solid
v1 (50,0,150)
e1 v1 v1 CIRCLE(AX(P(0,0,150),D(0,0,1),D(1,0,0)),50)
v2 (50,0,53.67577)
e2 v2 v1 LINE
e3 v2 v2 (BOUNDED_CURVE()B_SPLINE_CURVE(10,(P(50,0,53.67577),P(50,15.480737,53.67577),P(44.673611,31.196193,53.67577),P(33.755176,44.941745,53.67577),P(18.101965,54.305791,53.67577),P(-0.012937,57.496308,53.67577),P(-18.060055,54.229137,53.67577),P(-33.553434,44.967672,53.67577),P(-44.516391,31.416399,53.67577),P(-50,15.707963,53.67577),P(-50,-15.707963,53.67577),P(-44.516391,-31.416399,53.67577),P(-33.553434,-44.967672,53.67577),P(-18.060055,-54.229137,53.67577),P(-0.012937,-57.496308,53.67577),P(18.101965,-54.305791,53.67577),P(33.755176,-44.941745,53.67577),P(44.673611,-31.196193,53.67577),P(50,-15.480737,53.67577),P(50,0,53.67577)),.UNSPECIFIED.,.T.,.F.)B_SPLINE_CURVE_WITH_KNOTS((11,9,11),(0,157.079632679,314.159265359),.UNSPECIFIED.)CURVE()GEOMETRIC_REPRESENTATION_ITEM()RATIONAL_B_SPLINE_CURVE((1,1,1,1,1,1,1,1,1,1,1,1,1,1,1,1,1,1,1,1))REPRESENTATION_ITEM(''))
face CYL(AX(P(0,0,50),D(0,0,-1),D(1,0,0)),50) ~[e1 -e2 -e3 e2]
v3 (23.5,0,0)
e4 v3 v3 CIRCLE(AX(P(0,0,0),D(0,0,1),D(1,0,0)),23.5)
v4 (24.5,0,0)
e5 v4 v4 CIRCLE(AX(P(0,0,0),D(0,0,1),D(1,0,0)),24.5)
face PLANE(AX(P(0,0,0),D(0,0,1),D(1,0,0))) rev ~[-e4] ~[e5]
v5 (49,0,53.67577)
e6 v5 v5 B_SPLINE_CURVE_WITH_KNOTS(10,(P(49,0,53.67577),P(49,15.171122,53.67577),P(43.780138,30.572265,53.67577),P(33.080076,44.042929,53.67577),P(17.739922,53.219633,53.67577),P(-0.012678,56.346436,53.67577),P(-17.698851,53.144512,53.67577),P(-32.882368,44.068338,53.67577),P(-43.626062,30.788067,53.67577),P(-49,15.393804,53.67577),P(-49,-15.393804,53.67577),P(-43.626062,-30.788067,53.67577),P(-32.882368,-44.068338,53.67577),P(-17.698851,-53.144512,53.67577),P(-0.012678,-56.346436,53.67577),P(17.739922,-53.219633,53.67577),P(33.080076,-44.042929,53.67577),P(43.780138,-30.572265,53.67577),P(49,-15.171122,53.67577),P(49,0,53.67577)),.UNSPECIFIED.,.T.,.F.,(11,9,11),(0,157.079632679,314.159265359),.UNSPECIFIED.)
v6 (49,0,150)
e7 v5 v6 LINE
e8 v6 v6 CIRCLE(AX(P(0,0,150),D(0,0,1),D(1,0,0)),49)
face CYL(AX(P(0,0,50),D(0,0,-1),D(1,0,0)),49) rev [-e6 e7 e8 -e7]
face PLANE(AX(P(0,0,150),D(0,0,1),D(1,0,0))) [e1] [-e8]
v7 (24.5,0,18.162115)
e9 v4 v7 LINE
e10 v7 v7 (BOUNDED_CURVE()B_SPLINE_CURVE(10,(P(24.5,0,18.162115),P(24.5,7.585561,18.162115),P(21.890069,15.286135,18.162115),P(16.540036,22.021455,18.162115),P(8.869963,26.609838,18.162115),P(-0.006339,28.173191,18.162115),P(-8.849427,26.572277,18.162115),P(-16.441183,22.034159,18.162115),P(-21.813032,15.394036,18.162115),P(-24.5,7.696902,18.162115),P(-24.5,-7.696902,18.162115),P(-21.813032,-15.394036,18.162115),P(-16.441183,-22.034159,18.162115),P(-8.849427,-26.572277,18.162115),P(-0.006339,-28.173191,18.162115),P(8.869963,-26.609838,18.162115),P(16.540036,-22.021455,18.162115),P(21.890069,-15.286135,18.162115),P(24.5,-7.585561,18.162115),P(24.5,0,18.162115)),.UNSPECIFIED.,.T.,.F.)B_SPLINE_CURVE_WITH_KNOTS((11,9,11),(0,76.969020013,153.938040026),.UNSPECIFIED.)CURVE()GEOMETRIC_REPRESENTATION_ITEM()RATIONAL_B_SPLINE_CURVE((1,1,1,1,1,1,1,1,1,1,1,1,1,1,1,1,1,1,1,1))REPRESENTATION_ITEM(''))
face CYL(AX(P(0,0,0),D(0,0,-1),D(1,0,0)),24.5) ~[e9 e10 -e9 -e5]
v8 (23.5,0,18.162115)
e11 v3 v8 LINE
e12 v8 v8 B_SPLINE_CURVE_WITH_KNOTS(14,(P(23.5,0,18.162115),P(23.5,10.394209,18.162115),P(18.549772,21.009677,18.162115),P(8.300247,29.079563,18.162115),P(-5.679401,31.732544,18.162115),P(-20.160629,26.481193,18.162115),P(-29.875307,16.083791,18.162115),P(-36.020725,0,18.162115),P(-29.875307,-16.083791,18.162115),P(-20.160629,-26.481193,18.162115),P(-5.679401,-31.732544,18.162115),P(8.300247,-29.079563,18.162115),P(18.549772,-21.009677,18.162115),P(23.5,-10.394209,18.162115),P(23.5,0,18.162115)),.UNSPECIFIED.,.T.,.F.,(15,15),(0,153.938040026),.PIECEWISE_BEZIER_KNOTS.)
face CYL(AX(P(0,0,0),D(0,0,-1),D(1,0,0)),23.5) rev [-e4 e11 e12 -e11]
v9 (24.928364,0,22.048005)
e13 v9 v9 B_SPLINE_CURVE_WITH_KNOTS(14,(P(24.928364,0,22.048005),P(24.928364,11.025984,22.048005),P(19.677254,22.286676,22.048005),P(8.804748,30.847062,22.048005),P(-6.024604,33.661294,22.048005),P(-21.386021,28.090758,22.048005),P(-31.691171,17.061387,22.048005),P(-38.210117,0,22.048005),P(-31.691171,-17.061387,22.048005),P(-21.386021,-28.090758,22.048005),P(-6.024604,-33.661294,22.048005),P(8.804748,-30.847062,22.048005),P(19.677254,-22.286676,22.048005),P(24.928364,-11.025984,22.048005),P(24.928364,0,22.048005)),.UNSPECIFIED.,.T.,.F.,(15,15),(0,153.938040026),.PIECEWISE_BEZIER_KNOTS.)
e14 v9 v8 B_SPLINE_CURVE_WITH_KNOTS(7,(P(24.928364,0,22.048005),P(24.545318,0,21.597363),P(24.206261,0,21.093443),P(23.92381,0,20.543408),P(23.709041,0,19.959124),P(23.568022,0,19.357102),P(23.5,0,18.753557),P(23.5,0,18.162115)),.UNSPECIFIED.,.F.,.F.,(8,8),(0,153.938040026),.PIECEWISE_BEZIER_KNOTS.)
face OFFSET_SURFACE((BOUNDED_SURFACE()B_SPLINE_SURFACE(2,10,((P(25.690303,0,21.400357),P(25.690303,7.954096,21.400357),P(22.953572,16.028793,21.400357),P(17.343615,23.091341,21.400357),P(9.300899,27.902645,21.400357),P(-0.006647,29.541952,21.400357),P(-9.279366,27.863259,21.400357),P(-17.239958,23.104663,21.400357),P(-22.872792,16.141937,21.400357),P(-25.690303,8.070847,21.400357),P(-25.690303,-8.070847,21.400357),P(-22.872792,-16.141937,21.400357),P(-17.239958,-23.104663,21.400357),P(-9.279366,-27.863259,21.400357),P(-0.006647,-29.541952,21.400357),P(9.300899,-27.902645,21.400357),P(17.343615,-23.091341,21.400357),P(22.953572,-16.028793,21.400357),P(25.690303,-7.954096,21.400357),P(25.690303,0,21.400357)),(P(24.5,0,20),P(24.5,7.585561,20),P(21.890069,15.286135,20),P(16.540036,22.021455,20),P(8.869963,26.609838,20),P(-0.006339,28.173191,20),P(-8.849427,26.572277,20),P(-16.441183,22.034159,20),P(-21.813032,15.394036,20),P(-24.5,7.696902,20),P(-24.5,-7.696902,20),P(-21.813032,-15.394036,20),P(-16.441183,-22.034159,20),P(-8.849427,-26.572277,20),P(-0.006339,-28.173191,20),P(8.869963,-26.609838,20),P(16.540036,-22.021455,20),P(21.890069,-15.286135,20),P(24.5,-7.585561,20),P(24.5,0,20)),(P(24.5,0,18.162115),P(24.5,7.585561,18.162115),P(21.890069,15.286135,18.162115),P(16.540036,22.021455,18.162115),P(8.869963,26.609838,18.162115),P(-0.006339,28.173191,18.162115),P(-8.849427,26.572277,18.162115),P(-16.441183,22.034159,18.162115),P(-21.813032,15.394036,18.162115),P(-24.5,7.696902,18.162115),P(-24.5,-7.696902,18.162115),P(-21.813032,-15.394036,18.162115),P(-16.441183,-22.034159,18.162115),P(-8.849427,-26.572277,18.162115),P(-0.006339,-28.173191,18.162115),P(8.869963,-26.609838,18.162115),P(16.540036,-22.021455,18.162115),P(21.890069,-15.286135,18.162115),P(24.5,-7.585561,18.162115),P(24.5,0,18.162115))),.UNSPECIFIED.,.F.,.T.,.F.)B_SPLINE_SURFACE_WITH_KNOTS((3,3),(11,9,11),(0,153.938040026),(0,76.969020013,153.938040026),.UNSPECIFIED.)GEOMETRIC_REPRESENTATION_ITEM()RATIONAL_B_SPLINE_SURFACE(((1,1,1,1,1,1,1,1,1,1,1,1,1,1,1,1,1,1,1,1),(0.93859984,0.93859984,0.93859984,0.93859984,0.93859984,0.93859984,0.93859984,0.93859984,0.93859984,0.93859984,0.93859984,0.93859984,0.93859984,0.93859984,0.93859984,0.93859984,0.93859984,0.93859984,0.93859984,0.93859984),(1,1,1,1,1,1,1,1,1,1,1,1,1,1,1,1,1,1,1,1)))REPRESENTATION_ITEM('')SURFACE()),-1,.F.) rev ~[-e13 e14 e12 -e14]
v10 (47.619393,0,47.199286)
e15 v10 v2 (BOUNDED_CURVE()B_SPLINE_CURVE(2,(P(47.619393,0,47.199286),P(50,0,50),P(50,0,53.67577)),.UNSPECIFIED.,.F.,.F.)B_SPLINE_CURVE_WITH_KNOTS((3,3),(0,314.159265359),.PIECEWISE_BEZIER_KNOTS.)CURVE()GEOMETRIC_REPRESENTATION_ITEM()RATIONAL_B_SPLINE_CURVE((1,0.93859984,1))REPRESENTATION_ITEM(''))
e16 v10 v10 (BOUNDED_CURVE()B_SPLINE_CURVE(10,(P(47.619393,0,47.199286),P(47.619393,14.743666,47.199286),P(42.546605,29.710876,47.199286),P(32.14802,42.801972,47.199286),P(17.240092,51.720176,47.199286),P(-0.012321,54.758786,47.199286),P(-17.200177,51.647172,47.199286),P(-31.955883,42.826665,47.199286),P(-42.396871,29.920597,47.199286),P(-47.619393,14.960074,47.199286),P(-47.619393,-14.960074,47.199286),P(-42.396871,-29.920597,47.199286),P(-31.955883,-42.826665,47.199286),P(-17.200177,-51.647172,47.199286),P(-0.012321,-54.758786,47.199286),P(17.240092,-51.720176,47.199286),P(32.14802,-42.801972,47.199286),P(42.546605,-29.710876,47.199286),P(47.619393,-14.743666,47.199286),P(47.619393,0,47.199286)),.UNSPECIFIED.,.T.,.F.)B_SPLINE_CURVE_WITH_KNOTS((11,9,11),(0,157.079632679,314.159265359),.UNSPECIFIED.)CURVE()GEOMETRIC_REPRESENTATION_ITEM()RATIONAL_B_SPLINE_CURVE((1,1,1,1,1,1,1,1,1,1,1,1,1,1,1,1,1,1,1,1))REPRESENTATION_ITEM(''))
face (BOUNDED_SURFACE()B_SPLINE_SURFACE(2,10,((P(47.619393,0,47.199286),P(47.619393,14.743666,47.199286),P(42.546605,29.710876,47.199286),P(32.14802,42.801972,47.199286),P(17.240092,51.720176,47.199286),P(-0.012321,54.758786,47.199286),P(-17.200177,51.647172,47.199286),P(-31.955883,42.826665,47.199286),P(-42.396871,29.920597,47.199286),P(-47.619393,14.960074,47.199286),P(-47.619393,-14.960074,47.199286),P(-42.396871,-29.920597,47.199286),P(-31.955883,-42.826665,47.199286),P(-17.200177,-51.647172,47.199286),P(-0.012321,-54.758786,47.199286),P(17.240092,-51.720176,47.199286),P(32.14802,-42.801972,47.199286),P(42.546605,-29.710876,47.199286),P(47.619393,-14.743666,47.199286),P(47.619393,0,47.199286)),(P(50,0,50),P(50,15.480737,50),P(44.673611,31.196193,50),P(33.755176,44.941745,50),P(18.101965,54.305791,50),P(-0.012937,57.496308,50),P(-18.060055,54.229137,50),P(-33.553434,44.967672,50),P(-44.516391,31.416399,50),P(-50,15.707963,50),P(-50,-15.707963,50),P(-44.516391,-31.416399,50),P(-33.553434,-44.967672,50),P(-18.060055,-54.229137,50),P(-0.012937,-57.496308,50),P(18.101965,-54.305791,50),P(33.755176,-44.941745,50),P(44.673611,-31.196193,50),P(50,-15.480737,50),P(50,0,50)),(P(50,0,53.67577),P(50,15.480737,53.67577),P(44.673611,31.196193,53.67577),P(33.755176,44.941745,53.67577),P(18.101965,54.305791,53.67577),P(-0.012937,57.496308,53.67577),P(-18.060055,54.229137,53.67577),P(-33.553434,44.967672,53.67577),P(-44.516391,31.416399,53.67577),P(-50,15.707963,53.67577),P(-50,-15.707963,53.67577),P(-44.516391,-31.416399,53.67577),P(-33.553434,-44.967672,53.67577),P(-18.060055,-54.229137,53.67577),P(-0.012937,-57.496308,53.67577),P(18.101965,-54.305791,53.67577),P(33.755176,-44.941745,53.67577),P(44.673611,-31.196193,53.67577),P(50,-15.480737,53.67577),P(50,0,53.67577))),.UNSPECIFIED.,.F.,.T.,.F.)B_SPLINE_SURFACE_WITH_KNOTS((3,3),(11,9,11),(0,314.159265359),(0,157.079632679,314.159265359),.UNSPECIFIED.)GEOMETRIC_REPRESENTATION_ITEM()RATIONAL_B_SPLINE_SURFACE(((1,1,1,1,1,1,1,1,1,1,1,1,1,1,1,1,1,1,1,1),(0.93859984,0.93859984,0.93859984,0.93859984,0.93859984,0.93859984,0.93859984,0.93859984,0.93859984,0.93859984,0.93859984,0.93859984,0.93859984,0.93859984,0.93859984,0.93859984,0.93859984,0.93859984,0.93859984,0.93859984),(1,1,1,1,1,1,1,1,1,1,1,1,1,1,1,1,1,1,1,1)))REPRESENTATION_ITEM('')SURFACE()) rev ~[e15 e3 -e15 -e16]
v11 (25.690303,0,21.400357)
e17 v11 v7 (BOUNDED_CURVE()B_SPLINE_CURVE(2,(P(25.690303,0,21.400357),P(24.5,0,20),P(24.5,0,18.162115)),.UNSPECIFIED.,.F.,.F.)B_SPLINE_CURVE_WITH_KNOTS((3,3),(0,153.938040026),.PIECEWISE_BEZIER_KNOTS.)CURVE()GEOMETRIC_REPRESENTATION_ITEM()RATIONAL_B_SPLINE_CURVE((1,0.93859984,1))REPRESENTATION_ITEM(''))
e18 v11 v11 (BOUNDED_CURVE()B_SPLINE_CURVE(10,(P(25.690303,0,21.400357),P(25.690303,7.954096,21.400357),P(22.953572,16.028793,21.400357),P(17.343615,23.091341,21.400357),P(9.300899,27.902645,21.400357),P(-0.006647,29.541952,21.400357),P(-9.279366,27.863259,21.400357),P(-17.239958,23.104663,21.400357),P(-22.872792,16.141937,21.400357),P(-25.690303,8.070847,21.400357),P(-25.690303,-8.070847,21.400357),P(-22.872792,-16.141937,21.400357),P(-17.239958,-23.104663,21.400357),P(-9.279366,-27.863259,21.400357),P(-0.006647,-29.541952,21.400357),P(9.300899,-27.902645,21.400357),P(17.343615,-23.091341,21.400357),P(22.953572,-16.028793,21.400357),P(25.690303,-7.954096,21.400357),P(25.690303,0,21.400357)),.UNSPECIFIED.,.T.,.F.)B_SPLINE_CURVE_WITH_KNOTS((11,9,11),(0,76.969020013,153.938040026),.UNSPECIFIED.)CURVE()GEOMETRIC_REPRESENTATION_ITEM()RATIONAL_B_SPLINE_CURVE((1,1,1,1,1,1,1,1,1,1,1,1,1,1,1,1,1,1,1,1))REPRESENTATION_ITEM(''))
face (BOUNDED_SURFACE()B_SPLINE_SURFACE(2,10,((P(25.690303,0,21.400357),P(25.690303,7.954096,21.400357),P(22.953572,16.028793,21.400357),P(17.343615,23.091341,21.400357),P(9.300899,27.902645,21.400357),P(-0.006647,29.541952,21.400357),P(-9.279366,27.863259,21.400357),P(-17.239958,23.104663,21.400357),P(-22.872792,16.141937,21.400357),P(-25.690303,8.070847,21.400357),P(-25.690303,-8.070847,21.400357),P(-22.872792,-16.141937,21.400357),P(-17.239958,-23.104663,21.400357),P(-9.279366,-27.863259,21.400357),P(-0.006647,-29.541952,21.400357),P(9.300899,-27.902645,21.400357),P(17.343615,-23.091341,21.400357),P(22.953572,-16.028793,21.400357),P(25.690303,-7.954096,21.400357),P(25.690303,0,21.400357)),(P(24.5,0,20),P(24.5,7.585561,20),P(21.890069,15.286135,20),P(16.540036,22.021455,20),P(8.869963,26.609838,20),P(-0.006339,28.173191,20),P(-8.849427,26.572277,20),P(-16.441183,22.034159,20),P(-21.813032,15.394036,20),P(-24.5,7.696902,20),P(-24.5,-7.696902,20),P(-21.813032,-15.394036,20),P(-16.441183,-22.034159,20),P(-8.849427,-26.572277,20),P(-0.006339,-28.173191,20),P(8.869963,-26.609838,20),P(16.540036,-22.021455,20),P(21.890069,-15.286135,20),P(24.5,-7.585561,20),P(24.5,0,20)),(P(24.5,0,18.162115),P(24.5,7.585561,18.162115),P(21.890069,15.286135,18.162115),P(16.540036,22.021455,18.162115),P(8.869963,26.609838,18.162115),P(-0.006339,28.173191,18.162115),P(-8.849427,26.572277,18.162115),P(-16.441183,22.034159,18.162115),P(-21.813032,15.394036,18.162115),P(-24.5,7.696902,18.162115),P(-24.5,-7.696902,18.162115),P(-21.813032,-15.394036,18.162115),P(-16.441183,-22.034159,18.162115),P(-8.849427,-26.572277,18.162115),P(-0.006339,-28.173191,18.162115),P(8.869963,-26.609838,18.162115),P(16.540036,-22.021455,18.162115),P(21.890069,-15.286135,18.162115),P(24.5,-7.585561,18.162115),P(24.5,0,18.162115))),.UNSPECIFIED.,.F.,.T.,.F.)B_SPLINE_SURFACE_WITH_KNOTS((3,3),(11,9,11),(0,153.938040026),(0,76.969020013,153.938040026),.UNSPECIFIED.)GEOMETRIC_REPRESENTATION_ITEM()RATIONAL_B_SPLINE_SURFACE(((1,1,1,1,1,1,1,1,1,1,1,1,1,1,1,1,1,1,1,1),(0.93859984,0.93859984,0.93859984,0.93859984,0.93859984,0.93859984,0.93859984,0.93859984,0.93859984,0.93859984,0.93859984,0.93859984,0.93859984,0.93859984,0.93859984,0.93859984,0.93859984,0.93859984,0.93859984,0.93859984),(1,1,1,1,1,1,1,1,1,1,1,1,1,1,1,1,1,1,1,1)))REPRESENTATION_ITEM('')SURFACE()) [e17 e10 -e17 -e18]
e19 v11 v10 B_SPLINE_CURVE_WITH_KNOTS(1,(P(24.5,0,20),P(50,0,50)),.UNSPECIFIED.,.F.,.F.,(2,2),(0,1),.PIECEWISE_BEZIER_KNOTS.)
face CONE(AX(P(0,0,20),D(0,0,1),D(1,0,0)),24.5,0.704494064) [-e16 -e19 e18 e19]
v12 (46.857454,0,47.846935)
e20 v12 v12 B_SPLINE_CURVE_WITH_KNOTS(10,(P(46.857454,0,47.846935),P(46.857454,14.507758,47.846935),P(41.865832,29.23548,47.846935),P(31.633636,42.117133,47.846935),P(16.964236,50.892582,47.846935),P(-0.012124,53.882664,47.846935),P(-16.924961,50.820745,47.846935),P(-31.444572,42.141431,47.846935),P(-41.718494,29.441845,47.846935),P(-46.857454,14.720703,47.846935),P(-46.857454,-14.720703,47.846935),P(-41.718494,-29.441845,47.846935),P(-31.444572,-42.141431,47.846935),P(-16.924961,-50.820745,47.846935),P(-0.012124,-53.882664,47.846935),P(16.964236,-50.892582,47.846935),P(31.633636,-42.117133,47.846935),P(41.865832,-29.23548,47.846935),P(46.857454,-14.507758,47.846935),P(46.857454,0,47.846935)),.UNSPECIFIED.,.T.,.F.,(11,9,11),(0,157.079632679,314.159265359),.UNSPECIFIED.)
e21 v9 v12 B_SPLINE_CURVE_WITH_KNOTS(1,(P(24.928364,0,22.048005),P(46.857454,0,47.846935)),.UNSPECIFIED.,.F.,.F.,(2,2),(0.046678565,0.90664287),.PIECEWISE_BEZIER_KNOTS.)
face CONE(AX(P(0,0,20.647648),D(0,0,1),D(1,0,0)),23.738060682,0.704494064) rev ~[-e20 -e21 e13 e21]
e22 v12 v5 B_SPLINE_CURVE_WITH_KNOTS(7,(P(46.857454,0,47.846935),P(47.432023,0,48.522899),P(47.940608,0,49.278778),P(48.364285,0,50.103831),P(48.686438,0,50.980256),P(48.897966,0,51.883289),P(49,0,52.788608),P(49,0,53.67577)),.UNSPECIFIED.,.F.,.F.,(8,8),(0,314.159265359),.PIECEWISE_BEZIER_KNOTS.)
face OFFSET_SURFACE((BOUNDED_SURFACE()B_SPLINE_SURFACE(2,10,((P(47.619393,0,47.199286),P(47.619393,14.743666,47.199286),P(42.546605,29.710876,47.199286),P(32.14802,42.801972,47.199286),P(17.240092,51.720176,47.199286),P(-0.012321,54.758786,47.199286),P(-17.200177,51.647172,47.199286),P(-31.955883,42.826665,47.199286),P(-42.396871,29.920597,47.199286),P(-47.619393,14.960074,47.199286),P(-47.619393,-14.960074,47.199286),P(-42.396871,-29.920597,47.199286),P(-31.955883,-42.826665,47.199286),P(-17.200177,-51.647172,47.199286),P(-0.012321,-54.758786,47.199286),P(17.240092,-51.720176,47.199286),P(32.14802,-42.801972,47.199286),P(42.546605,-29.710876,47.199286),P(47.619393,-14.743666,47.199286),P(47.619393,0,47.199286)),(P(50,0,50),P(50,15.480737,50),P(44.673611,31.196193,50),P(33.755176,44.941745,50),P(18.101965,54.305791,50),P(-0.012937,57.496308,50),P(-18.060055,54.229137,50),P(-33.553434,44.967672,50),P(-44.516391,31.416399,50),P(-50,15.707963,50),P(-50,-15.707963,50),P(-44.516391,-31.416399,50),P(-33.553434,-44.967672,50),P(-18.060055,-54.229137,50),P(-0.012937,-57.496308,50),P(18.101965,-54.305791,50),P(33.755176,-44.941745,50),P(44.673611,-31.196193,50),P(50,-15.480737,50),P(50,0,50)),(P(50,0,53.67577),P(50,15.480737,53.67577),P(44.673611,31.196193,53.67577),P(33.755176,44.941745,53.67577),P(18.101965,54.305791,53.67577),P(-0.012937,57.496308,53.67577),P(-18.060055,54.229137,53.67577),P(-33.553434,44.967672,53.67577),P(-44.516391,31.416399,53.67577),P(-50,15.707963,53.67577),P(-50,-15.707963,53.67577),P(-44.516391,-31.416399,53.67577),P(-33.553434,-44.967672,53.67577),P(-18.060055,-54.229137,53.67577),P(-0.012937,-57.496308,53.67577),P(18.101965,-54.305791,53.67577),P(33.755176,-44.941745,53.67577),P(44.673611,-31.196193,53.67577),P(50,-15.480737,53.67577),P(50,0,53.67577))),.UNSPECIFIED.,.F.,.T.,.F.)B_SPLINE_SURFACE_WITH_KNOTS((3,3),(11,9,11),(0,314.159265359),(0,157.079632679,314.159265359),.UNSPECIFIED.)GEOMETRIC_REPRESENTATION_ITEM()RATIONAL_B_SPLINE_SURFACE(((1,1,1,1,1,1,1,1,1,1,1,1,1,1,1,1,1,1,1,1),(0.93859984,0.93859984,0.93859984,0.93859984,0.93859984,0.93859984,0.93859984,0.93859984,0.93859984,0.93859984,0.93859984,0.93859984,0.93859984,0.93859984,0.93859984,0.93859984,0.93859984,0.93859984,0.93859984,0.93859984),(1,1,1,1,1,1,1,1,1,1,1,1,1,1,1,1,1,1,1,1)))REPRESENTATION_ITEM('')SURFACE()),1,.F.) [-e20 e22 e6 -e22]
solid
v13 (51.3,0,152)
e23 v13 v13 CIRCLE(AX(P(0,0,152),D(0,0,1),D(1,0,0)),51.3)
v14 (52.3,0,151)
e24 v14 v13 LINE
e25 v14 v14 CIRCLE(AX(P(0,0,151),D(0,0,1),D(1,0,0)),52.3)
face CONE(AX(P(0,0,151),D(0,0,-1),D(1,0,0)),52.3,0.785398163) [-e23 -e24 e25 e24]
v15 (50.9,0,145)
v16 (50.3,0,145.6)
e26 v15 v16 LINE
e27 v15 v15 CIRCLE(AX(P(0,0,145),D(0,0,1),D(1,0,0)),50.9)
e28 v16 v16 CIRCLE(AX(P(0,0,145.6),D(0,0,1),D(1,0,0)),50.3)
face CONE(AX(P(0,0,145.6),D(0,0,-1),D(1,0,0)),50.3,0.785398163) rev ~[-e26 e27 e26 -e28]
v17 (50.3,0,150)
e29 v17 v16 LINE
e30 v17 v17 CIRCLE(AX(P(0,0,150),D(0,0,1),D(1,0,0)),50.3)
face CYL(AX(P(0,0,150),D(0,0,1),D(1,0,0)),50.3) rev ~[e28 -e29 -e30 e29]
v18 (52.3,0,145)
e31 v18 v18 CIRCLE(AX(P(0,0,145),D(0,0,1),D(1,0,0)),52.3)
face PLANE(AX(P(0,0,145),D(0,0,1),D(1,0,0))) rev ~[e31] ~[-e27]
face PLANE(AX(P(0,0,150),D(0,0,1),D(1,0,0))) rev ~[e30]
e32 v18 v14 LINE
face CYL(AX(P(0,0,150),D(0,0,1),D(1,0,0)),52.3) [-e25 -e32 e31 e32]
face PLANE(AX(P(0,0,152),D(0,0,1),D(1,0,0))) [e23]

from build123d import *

# Parameters (mm, degrees)
F0_R      = 24.5
F1_DEPTH  = 20
F1_FACE_R = 24.5
F3_R      = 50
F5_DEPTH  = 100
F6_R      = 5
F7_R      = 10
F8_T      = -1
F9_R      = 52.3
F9_R_2    = 50.3
F9_R_3    = 50
F9_R_4    = 49
F10_DEPTH = 2
F11_DEPTH = 5
F12_SIZE  = 1
F13_SIZE  = 0.6


with BuildPart() as f1:
    # F0 (on Top) → F1 (new body)
    with BuildSketch(Plane.XY):
        Circle(F0_R)
    extrude(amount=F1_DEPTH)

    # F1_face (on face) → F4 section 0
    with BuildSketch(Plane.XY.offset(20)):
        Circle(F1_FACE_R)
    # F3 (on offset) → F4 section 1
    with BuildSketch(Plane.XY.offset(50)):
        Circle(F3_R)
    loft()

    # F5 (add): a face of the model
    f5_faces = [f1.faces().sort_by_distance(p)[0] for p in [
        (0, 0, 50),
    ]]
    extrude(f5_faces, amount=F5_DEPTH)

    # F6
    f6_edges = [f1.edges().sort_by_distance(p)[0] for p in [
        (-24.5, 0, 20),
    ]]
    fillet(f6_edges, radius=F6_R)

    # F7
    f7_edges = [f1.edges().sort_by_distance(p)[0] for p in [
        (-50, 0, 50),
    ]]
    fillet(f7_edges, radius=F7_R)

    # F8
    f8_openings = [f1.faces().sort_by_distance(p)[0] for p in [
        (0, 0, 0),
        (0, 0, 150),
    ]]
    offset(amount=F8_T, openings=f8_openings)


with BuildPart() as f10:
    # F9 (on face) → F10 (new body)
    with BuildSketch(Plane.XY.offset(150)):
        Circle(F9_R)
        Circle(F9_R_2, mode=Mode.SUBTRACT)
        Circle(F9_R_2)
        Circle(F9_R_3, mode=Mode.SUBTRACT)
        Circle(F9_R_3)
        Circle(F9_R_4, mode=Mode.SUBTRACT)
        Circle(F9_R_4)
    extrude(amount=F10_DEPTH)

    # F9 (on face) → F11 (join)
    with BuildSketch(Plane.XY.offset(150)):
        Circle(F9_R)
        Circle(F9_R_2, mode=Mode.SUBTRACT)
    extrude(amount=-F11_DEPTH)

    # F12
    f12_edges = [f10.edges().sort_by_distance(p)[0] for p in [
        (-52.3, 0, 152),
    ]]
    chamfer(f12_edges, length=F12_SIZE)

    # F13
    f13_edges = [f10.edges().sort_by_distance(p)[0] for p in [
        (-50.3, 0, 145),
    ]]
    chamfer(f13_edges, length=F13_SIZE)


solid = Compound([f1.part, f10.part])
